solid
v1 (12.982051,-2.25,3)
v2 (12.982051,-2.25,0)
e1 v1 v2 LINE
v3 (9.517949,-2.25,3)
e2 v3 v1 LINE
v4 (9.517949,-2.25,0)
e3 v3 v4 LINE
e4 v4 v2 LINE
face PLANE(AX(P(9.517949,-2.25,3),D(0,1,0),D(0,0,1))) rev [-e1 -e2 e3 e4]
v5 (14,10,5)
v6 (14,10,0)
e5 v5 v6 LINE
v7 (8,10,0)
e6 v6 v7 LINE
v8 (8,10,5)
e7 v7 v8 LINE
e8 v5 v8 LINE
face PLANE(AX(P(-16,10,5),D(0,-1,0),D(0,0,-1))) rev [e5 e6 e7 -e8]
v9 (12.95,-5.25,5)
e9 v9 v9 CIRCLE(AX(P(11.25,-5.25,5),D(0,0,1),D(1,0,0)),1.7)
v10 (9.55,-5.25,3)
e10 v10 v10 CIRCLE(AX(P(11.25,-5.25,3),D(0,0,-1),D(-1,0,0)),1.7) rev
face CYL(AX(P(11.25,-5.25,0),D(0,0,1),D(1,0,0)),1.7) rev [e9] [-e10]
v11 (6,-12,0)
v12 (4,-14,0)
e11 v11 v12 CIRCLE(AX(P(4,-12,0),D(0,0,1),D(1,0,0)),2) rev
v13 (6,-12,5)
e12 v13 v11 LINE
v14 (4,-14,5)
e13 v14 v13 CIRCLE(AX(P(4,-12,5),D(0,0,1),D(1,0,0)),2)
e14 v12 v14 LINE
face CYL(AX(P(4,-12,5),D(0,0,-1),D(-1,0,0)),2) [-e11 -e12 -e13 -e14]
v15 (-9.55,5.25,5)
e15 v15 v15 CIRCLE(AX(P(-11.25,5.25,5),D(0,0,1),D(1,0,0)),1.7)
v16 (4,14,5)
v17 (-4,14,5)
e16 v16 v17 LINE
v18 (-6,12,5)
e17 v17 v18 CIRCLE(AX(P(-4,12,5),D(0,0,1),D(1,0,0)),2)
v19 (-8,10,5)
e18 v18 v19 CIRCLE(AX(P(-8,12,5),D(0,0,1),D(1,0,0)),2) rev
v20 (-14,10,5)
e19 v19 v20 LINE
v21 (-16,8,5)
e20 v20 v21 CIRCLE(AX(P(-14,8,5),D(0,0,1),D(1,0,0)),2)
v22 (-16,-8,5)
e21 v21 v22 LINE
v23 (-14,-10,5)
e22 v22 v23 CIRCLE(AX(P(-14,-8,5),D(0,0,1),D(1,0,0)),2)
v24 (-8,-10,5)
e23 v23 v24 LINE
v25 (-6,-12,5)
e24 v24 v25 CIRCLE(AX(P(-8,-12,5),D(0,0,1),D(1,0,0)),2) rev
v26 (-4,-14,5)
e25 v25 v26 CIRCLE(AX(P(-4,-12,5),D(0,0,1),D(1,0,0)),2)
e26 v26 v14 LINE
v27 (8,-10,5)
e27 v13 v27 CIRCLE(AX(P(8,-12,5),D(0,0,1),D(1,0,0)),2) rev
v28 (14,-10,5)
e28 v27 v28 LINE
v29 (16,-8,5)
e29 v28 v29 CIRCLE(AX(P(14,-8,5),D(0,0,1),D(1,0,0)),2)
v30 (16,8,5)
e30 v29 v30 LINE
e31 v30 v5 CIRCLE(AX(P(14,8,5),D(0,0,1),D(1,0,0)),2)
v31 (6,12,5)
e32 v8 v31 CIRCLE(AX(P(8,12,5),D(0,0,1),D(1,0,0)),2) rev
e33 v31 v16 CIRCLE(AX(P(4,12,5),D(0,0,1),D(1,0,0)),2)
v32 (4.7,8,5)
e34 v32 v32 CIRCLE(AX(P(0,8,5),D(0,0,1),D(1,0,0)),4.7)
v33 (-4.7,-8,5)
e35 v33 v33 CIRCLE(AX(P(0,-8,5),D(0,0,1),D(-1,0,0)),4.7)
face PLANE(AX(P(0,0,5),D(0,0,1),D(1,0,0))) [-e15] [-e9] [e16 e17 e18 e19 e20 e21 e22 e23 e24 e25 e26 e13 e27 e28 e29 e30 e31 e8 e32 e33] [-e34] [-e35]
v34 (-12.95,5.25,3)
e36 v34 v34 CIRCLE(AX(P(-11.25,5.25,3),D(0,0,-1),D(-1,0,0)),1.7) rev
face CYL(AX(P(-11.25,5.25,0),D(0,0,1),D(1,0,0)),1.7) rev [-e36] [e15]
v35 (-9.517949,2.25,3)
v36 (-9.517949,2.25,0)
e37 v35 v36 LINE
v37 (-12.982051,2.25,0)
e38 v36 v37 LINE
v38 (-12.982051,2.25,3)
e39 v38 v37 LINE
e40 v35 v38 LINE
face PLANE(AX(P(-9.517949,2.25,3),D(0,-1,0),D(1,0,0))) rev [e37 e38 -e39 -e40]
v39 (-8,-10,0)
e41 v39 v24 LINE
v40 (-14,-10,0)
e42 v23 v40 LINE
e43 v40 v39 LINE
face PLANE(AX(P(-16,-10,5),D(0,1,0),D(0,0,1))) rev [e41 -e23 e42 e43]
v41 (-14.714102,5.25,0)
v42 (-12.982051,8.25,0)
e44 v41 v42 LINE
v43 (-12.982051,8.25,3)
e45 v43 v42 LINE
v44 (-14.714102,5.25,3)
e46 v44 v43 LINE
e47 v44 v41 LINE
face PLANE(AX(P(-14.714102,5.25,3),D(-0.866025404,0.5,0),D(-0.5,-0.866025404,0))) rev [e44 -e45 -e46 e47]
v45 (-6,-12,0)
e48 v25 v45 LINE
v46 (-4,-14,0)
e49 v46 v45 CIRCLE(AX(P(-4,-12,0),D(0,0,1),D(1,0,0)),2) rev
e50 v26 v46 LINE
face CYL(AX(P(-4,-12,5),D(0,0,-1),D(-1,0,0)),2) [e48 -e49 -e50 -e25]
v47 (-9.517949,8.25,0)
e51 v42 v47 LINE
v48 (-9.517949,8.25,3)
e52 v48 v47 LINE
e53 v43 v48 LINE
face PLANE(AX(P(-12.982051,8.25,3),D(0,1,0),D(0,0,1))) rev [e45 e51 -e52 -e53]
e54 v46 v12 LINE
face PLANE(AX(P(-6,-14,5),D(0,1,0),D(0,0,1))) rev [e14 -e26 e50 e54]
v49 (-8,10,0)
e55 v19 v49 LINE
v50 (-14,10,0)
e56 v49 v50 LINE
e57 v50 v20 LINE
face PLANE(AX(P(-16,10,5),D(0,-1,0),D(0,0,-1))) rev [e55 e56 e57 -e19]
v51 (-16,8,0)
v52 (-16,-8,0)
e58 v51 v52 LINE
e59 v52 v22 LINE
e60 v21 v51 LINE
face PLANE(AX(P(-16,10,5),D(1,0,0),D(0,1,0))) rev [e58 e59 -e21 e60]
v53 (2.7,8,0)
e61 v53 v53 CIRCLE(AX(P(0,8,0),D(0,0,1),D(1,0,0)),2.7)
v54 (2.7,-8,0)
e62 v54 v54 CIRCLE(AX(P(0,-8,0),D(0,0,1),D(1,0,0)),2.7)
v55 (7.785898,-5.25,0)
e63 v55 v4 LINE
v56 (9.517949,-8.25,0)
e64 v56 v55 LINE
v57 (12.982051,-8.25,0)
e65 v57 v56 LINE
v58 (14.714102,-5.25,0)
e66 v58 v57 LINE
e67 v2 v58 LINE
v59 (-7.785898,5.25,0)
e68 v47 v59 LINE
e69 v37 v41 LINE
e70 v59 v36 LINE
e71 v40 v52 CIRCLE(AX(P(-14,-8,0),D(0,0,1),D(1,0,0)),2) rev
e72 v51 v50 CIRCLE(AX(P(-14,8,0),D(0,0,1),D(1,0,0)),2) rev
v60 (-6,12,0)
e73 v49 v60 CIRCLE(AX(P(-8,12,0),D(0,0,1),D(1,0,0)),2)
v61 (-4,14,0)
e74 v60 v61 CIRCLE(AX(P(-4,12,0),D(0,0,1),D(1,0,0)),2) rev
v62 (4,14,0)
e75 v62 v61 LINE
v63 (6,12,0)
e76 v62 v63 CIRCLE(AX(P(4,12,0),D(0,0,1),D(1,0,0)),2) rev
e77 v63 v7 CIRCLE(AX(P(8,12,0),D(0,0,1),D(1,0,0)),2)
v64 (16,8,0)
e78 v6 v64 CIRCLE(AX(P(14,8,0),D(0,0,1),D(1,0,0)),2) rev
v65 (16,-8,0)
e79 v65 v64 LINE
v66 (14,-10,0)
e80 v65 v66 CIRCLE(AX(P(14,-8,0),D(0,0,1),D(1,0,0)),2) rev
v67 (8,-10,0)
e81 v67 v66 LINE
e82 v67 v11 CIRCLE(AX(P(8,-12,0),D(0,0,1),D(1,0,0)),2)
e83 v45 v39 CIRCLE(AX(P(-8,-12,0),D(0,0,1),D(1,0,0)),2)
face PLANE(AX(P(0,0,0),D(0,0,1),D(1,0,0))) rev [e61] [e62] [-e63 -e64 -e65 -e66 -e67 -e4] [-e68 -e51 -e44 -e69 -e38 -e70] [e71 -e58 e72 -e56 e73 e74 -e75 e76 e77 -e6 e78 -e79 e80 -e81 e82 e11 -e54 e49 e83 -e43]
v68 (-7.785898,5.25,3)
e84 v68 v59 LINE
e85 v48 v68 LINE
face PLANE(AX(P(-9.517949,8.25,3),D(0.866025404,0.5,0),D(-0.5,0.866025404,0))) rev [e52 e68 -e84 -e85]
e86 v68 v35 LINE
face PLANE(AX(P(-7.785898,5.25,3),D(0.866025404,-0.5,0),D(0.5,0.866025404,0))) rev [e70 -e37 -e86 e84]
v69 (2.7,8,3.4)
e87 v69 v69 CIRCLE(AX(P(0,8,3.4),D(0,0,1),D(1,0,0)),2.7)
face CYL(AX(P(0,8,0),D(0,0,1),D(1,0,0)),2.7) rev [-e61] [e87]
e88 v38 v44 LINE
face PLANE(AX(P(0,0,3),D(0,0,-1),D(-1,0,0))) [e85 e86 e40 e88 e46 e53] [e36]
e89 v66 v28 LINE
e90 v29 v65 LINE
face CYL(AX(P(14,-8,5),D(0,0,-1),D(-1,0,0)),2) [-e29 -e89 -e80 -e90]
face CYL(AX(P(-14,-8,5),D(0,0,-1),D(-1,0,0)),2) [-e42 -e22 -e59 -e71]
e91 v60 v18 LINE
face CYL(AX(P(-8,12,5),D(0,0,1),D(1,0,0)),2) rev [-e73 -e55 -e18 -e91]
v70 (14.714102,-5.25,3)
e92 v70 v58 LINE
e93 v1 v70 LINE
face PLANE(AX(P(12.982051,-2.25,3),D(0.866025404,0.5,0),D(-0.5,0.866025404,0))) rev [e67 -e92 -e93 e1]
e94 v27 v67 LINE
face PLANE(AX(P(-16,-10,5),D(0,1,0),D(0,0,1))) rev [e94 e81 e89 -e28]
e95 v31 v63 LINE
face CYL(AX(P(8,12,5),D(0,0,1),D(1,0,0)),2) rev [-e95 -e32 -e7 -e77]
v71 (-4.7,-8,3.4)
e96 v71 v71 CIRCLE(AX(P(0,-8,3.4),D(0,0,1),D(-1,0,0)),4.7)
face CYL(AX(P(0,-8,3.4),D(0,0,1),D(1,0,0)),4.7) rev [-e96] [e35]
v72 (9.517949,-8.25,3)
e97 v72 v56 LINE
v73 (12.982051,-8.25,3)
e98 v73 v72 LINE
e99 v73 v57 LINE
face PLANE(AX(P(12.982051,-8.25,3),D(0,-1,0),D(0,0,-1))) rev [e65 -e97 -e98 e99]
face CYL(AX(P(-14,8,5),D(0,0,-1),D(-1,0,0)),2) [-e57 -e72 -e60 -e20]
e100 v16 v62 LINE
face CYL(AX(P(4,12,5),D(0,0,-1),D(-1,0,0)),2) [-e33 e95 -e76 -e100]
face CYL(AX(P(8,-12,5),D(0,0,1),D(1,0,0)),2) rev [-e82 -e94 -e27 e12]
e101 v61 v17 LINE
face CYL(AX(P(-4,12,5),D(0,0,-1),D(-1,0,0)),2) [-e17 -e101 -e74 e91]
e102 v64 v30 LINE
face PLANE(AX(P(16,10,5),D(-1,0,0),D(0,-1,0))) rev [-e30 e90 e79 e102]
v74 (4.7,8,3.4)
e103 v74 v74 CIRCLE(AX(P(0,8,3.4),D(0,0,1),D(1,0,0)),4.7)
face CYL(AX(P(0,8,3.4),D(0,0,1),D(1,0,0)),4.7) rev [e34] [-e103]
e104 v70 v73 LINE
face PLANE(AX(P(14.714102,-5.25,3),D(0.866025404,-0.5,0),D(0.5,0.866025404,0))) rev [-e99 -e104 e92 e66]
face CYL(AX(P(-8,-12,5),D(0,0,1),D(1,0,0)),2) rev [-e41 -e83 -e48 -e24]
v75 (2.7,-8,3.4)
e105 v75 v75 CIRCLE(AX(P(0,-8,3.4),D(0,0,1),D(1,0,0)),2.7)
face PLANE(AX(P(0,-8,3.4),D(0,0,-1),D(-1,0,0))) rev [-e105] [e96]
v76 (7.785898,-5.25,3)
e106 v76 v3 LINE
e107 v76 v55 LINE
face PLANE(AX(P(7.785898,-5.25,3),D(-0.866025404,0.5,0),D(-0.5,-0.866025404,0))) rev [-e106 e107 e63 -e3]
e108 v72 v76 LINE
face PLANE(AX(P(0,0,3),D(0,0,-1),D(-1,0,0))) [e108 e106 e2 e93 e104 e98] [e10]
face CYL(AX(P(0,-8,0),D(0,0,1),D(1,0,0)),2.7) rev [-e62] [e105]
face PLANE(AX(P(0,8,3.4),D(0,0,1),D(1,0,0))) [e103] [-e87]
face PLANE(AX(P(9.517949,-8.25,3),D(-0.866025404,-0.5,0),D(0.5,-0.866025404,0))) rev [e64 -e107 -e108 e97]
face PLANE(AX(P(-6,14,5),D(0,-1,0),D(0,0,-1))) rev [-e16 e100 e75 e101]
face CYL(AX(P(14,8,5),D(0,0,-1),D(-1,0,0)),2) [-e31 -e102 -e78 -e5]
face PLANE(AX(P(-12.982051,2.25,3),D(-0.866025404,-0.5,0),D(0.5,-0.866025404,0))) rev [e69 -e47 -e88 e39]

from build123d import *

# Parameters (mm, degrees)
SCHIZZO1_W                   = 32
SCHIZZO1_H                   = 20
ESTRUSIONE_ESTRUSIONE1_DEPTH = 5
SCHIZZO2_R                   = 1.7
TAGLIO_ESTRUSIONE1_DEPTH     = 20.519221296
SCHIZZO3_W                   = 12
SCHIZZO3_H                   = 4
ESTRUSIONE_ESTRUSIONE2_DEPTH = 5
SCHIZZO4_R                   = 4.7
TAGLIO_ESTRUSIONE2_DEPTH     = 1.6
SCHIZZO5_R                   = 2.7
TAGLIO_ESTRUSIONE3_DEPTH     = 22.530443563
TAGLIO_ESTRUSIONE4_DEPTH     = 3
RACCORDO1_R                  = 2


with BuildPart() as part:
    # Schizzo1 → Estrusione-Estrusione1 (new body)
    with BuildSketch(Plane.XY):
        Rectangle(SCHIZZO1_W, SCHIZZO1_H)
    extrude(amount=ESTRUSIONE_ESTRUSIONE1_DEPTH)

    # Schizzo2 → Taglio-Estrusione1 (cut, through all)
    with BuildSketch(Plane.XY.offset(5)):
        with Locations((-11.25, 5.25)):
            Circle(SCHIZZO2_R)
        with Locations((11.25, -5.25)):
            Circle(SCHIZZO2_R)
    extrude(amount=-TAGLIO_ESTRUSIONE1_DEPTH, mode=Mode.SUBTRACT)

    # Schizzo3 → Estrusione-Estrusione2 (add)
    with BuildSketch(Plane.XY):
        with Locations((0, 12)):
            Rectangle(SCHIZZO3_W, SCHIZZO3_H)
        with Locations((0, -12)):
            Rectangle(SCHIZZO3_W, SCHIZZO3_H)
    extrude(amount=ESTRUSIONE_ESTRUSIONE2_DEPTH)

    # Schizzo4 → Taglio-Estrusione2 (cut)
    with BuildSketch(Plane.XY.offset(5)):
        with Locations((0, 8)):
            Circle(SCHIZZO4_R)
        with Locations(Location((0, -8, 0), (0, 0, 180))):
            Circle(SCHIZZO4_R)
    extrude(amount=-TAGLIO_ESTRUSIONE2_DEPTH, mode=Mode.SUBTRACT)

    # Schizzo5 → Taglio-Estrusione3 (cut, through all)
    with BuildSketch(Plane.XY.offset(3.4)):
        with Locations((0, 8)):
            Circle(SCHIZZO5_R)
        with Locations((0, -8)):
            Circle(SCHIZZO5_R)
    extrude(amount=-TAGLIO_ESTRUSIONE3_DEPTH, mode=Mode.SUBTRACT)

    # Schizzo6 → Taglio-Estrusione4 (cut)
    with BuildSketch(Plane(origin=(0, 0, 0), x_dir=(-1, 0, 0), z_dir=(0, 0, -1))):
        Polygon((7.785898385, 5.25), (9.517949192, 2.25), (12.982050808, 2.25), (14.714101615, 5.25), (12.982050808, 8.25), (9.517949192, 8.25), align=None)
        Polygon((-14.714101615, -5.25), (-12.982050808, -8.25), (-9.517949192, -8.25), (-7.785898385, -5.25), (-9.517949192, -2.25), (-12.982050808, -2.25), align=None)
    extrude(amount=-TAGLIO_ESTRUSIONE4_DEPTH, mode=Mode.SUBTRACT)

    # Raccordo1
    raccordo1_edges = [part.edges().sort_by_distance(p)[0] for p in [
        (16, 10, 2.5),
        (16, -10, 2.5),
        (6, -10, 2.5),
        (6, -14, 2.5),
        (-6, -14, 2.5),
        (-6, -10, 2.5),
        (-16, -10, 2.5),
        (-16, 10, 2.5),
        (6, 14, 2.5),
        (-6, 14, 2.5),
        (-6, 10, 2.5),
        (6, 10, 2.5),
    ]]
    fillet(raccordo1_edges, radius=RACCORDO1_R - 0.0001)  # a hair under: the kernel refuses the full size


solid = part.part
